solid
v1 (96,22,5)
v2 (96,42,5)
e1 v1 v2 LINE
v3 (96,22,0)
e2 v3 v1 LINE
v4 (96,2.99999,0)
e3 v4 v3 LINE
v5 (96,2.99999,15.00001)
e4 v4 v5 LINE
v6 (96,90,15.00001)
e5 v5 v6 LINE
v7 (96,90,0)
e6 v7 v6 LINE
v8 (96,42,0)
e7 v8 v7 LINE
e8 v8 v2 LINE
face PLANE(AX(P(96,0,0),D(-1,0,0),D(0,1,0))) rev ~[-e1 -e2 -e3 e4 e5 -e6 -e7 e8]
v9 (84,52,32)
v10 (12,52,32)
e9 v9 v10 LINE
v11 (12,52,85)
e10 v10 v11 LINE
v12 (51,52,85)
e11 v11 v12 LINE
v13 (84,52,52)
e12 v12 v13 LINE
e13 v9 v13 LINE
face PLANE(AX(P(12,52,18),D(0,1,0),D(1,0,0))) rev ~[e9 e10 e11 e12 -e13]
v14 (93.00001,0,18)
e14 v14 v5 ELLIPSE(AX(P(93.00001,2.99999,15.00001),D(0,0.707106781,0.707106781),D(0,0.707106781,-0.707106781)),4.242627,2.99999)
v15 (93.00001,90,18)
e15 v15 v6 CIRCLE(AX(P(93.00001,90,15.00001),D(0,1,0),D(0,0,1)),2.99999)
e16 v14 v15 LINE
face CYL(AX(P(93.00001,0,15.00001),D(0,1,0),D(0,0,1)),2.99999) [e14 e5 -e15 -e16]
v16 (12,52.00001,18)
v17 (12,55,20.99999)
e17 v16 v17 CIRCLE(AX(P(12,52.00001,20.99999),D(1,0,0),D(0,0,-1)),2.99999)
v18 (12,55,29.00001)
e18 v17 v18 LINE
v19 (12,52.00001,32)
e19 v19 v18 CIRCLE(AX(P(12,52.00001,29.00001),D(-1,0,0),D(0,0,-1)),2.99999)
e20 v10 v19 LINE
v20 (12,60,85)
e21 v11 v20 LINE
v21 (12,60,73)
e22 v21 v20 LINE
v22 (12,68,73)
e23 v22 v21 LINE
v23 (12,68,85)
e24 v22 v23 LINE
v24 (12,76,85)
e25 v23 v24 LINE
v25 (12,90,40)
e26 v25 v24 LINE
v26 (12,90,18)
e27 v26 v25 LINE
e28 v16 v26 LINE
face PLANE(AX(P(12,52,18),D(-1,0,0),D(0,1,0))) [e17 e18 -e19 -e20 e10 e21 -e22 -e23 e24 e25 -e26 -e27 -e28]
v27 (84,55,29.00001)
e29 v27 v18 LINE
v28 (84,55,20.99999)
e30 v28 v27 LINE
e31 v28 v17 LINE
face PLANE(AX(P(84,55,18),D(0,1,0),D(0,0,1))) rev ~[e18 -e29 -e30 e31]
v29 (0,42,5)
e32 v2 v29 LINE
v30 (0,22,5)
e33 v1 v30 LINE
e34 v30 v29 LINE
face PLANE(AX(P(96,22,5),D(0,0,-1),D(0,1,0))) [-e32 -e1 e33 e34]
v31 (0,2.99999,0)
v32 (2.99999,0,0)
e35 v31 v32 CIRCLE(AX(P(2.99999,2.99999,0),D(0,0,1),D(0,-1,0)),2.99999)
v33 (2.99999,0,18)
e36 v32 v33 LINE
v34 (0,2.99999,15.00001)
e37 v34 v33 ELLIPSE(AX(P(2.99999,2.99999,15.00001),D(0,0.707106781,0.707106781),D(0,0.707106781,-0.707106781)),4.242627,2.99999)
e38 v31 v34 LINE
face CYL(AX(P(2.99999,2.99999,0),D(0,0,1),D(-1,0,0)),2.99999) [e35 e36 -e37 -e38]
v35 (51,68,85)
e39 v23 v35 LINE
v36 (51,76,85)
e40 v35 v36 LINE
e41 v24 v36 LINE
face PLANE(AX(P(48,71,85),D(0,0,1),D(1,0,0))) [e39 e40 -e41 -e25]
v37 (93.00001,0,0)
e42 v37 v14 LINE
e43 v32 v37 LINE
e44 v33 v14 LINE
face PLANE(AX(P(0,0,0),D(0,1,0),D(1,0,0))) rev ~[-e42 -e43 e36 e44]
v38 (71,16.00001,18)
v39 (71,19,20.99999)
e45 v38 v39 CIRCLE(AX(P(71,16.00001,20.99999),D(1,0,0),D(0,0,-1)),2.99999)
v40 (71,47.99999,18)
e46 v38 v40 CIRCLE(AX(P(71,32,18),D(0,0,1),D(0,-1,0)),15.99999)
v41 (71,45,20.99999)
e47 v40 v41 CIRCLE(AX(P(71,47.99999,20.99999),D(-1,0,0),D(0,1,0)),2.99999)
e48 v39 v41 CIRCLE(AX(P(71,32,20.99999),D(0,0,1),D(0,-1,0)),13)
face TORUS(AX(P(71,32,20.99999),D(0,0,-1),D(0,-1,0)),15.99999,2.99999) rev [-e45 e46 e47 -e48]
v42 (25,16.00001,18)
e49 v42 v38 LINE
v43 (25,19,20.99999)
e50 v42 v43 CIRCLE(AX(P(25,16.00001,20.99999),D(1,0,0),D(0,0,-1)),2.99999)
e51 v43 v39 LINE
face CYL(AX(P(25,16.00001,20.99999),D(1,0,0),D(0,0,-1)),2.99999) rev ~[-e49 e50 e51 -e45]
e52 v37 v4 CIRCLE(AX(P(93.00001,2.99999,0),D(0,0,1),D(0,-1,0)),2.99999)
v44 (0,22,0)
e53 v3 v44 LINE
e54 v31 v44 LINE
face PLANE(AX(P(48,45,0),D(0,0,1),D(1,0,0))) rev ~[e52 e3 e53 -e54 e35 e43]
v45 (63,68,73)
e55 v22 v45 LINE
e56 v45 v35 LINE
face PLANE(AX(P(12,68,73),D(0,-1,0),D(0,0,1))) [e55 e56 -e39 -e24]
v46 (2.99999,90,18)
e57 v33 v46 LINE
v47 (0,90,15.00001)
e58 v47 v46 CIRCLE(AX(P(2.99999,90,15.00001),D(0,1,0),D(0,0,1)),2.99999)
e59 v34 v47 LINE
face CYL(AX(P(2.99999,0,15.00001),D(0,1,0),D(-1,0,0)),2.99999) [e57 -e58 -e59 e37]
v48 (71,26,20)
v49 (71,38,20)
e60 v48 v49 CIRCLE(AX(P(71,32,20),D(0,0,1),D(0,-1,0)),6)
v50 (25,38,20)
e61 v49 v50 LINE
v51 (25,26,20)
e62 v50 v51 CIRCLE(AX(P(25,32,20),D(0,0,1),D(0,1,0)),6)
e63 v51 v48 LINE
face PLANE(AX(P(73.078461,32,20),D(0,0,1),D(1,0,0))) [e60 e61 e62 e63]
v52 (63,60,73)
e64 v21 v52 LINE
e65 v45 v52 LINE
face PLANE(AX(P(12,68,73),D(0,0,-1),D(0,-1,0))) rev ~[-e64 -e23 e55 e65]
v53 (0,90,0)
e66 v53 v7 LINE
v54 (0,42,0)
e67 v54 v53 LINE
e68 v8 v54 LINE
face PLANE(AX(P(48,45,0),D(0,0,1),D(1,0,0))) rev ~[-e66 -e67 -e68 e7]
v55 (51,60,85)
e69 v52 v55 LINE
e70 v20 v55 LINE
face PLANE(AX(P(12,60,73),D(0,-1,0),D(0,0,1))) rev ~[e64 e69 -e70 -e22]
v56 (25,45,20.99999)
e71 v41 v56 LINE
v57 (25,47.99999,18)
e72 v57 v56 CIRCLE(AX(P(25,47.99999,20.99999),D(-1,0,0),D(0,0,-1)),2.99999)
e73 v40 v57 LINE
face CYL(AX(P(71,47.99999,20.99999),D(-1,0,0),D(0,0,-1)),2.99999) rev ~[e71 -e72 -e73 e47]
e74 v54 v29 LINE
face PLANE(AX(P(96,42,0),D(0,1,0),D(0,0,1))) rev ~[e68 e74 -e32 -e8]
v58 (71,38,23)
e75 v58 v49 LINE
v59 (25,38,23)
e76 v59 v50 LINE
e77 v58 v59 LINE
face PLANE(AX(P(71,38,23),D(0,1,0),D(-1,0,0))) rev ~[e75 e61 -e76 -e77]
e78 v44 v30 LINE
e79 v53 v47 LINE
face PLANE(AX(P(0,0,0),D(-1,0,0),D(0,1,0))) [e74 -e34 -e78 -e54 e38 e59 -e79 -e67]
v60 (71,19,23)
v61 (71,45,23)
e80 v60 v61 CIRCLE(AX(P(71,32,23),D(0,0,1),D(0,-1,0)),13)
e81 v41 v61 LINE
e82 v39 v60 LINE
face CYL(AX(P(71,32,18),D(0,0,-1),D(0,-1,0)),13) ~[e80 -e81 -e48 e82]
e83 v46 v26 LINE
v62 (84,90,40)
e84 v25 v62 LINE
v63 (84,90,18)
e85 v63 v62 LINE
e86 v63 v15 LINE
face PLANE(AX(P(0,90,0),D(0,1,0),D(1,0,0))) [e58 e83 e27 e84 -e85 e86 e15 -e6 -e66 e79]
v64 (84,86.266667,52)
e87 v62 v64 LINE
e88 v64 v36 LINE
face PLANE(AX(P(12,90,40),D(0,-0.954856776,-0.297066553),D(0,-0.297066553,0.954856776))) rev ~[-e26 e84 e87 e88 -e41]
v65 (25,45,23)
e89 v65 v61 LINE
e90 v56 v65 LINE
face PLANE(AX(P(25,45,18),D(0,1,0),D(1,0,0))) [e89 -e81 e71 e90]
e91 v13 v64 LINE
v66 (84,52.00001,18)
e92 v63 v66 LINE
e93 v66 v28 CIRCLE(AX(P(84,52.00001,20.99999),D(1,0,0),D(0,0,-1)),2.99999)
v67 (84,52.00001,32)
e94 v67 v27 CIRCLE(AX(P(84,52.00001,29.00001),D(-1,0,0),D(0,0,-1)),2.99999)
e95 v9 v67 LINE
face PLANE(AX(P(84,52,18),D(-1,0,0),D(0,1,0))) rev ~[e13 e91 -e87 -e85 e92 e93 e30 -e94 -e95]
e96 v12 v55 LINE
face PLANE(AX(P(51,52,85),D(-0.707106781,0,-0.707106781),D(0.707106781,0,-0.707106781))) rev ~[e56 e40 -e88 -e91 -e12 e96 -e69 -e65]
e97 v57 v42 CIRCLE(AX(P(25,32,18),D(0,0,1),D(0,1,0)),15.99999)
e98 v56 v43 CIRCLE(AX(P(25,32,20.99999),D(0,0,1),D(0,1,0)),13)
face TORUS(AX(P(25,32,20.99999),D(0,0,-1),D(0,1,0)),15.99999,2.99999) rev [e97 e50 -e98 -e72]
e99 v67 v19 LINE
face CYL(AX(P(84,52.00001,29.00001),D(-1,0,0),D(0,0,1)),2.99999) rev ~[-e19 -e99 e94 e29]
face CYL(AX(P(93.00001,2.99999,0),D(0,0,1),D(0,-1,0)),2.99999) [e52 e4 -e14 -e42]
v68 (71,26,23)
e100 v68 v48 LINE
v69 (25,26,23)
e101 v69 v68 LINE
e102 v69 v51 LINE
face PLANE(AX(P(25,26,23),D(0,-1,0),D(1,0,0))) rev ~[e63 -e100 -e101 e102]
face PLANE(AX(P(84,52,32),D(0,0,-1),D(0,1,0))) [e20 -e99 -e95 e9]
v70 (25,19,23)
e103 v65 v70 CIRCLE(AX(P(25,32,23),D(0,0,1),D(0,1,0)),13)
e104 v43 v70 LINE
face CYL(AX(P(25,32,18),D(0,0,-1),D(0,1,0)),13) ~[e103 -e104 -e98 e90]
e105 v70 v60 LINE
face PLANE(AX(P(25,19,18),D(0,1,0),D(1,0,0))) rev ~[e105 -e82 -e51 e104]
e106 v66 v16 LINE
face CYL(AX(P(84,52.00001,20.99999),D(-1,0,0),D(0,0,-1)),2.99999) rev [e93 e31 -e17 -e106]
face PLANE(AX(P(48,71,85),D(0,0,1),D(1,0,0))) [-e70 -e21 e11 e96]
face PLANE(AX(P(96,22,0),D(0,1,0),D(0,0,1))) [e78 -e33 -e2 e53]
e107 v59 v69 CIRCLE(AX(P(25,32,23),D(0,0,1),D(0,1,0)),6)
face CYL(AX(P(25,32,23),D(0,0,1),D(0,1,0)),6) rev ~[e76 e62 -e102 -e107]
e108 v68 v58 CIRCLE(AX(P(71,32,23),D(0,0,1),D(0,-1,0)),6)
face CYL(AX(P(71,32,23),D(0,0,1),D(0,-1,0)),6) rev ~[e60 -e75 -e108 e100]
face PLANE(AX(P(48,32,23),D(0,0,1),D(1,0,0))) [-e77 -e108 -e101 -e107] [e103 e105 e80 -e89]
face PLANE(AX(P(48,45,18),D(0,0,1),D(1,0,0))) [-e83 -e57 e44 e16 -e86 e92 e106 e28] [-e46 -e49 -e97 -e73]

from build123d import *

# Parameters (mm, degrees)
F0_W      = 96
F0_H      = 90
F1_DEPTH  = 18
F2_W      = 72
F2_H      = 38
F4_DEPTH  = 67
F6_DEPTH  = 38
F7_W      = 8
F7_H      = 12
F8_DEPTH  = 51.001
F10_DEPTH = 72.001
F11_W     = 20
F11_H     = 5
F12_DEPTH = 96
F13_W     = 46
F13_H     = 26
F14_DEPTH = 5
F16_DEPTH = 3
F17_W     = 3
F17_H     = 14
F18_DEPTH = 72
F19_R     = 2.99999


# Not quite as in the source:
# - a fillet or chamfer is up to 0.001 mm smaller than in the source, because OpenCascade refuses the exact size


with BuildPart() as f1:
    # F0 (on Top) → F1 (new body)
    with BuildSketch(Plane.XY):
        with Locations((48, 45)):
            Rectangle(F0_W, F0_H)
    extrude(amount=F1_DEPTH)

    # F2 (on face) → F4 (join, through all)
    with BuildSketch(Plane.XY.offset(18)):
        with Locations((48, 71)):
            Rectangle(F2_W, F2_H)
    extrude(amount=F4_DEPTH)

    # F5 (on face) → F6 (cut, through all)
    with BuildSketch(Plane.XZ.offset(-52)):
        Polygon((84, 52), (84, 85), (51, 85), align=None)
    extrude(amount=-F6_DEPTH, mode=Mode.SUBTRACT)

    # F7 (on face) → F8 (cut, through all)
    with BuildSketch(Plane(origin=(12, 0, 0), x_dir=(0, -1, 0), z_dir=(-1, 0, 0))):
        with Locations((-64, 79)):
            Rectangle(F7_W, F7_H)
    extrude(amount=-F8_DEPTH, mode=Mode.SUBTRACT)

    # F9 (on face) → F10 (cut, through all)
    with BuildSketch(Plane(origin=(12, 0, 0), x_dir=(0, -1, 0), z_dir=(-1, 0, 0))):
        Polygon((-90, 40), (-76, 85), (-90, 85), align=None)
    extrude(amount=-F10_DEPTH, mode=Mode.SUBTRACT)

    # F11 (on face) → F12 (cut, through all)
    with BuildSketch(Plane.YZ.offset(96)):
        with Locations((32, 2.5)):
            Rectangle(F11_W, F11_H)
    extrude(amount=-F12_DEPTH, mode=Mode.SUBTRACT)

    # F13 (on face) → F14 (join)
    with BuildSketch(Plane.XY.offset(18)):
        with Locations((48, 31.9999999999)):
            Rectangle(F13_W, F13_H)
        with BuildLine():
            Line((25, 18.9999999999), (25, 44.9999999999))
            ThreePointArc((25, 44.9999999999), (12, 31.9999999999), (25, 18.9999999999))
        make_face()
        with BuildLine():
            ThreePointArc((71, 18.9999999999), (84, 31.9999999999), (71, 44.9999999999))
            Line((71, 44.9999999999), (71, 18.9999999999))
        make_face()
    extrude(amount=F14_DEPTH)

    # F15 (on face) → F16 (cut)
    with BuildSketch(Plane.XY.offset(23)):
        with BuildLine():
            ThreePointArc((71, 25.9999999999), (77, 31.9999999999), (71, 37.9999999999))
            Line((71, 37.9999999999), (71, 25.9999999999))
        make_face()
        Polygon((25, 37.9999999999), (25, 31.9999999999), (25, 25.9999999999), (71, 25.9999999999), (71, 37.9999999999), align=None)
        with BuildLine():
            Line((25, 25.9999999999), (25, 31.9999999999))
            Line((25, 31.9999999999), (25, 37.9999999999))
            ThreePointArc((25, 37.9999999999), (19, 31.9999999999), (25, 25.9999999999))
        make_face()
    extrude(amount=-F16_DEPTH, mode=Mode.SUBTRACT)

    # F17 (on face) → F18 (cut, through all)
    with BuildSketch(Plane.YZ.offset(84)):
        with Locations((53.5, 25)):
            Rectangle(F17_W, F17_H)
    extrude(amount=-F18_DEPTH, mode=Mode.SUBTRACT)

    # F19 (radius 3 in the source; OpenCascade refuses exactly that, so slightly less here)
    f19_edges = [f1.edges().sort_by_distance(p)[0] for p in [
        (48, 55, 18),
        (48, 19, 18),
        (48, 55, 32),
        (96, 45, 18),
        (0, 45, 18),
        (96, 0, 9),
        (0, 0, 9),
    ]]
    fillet(f19_edges, radius=F19_R)


solid = f1.part
